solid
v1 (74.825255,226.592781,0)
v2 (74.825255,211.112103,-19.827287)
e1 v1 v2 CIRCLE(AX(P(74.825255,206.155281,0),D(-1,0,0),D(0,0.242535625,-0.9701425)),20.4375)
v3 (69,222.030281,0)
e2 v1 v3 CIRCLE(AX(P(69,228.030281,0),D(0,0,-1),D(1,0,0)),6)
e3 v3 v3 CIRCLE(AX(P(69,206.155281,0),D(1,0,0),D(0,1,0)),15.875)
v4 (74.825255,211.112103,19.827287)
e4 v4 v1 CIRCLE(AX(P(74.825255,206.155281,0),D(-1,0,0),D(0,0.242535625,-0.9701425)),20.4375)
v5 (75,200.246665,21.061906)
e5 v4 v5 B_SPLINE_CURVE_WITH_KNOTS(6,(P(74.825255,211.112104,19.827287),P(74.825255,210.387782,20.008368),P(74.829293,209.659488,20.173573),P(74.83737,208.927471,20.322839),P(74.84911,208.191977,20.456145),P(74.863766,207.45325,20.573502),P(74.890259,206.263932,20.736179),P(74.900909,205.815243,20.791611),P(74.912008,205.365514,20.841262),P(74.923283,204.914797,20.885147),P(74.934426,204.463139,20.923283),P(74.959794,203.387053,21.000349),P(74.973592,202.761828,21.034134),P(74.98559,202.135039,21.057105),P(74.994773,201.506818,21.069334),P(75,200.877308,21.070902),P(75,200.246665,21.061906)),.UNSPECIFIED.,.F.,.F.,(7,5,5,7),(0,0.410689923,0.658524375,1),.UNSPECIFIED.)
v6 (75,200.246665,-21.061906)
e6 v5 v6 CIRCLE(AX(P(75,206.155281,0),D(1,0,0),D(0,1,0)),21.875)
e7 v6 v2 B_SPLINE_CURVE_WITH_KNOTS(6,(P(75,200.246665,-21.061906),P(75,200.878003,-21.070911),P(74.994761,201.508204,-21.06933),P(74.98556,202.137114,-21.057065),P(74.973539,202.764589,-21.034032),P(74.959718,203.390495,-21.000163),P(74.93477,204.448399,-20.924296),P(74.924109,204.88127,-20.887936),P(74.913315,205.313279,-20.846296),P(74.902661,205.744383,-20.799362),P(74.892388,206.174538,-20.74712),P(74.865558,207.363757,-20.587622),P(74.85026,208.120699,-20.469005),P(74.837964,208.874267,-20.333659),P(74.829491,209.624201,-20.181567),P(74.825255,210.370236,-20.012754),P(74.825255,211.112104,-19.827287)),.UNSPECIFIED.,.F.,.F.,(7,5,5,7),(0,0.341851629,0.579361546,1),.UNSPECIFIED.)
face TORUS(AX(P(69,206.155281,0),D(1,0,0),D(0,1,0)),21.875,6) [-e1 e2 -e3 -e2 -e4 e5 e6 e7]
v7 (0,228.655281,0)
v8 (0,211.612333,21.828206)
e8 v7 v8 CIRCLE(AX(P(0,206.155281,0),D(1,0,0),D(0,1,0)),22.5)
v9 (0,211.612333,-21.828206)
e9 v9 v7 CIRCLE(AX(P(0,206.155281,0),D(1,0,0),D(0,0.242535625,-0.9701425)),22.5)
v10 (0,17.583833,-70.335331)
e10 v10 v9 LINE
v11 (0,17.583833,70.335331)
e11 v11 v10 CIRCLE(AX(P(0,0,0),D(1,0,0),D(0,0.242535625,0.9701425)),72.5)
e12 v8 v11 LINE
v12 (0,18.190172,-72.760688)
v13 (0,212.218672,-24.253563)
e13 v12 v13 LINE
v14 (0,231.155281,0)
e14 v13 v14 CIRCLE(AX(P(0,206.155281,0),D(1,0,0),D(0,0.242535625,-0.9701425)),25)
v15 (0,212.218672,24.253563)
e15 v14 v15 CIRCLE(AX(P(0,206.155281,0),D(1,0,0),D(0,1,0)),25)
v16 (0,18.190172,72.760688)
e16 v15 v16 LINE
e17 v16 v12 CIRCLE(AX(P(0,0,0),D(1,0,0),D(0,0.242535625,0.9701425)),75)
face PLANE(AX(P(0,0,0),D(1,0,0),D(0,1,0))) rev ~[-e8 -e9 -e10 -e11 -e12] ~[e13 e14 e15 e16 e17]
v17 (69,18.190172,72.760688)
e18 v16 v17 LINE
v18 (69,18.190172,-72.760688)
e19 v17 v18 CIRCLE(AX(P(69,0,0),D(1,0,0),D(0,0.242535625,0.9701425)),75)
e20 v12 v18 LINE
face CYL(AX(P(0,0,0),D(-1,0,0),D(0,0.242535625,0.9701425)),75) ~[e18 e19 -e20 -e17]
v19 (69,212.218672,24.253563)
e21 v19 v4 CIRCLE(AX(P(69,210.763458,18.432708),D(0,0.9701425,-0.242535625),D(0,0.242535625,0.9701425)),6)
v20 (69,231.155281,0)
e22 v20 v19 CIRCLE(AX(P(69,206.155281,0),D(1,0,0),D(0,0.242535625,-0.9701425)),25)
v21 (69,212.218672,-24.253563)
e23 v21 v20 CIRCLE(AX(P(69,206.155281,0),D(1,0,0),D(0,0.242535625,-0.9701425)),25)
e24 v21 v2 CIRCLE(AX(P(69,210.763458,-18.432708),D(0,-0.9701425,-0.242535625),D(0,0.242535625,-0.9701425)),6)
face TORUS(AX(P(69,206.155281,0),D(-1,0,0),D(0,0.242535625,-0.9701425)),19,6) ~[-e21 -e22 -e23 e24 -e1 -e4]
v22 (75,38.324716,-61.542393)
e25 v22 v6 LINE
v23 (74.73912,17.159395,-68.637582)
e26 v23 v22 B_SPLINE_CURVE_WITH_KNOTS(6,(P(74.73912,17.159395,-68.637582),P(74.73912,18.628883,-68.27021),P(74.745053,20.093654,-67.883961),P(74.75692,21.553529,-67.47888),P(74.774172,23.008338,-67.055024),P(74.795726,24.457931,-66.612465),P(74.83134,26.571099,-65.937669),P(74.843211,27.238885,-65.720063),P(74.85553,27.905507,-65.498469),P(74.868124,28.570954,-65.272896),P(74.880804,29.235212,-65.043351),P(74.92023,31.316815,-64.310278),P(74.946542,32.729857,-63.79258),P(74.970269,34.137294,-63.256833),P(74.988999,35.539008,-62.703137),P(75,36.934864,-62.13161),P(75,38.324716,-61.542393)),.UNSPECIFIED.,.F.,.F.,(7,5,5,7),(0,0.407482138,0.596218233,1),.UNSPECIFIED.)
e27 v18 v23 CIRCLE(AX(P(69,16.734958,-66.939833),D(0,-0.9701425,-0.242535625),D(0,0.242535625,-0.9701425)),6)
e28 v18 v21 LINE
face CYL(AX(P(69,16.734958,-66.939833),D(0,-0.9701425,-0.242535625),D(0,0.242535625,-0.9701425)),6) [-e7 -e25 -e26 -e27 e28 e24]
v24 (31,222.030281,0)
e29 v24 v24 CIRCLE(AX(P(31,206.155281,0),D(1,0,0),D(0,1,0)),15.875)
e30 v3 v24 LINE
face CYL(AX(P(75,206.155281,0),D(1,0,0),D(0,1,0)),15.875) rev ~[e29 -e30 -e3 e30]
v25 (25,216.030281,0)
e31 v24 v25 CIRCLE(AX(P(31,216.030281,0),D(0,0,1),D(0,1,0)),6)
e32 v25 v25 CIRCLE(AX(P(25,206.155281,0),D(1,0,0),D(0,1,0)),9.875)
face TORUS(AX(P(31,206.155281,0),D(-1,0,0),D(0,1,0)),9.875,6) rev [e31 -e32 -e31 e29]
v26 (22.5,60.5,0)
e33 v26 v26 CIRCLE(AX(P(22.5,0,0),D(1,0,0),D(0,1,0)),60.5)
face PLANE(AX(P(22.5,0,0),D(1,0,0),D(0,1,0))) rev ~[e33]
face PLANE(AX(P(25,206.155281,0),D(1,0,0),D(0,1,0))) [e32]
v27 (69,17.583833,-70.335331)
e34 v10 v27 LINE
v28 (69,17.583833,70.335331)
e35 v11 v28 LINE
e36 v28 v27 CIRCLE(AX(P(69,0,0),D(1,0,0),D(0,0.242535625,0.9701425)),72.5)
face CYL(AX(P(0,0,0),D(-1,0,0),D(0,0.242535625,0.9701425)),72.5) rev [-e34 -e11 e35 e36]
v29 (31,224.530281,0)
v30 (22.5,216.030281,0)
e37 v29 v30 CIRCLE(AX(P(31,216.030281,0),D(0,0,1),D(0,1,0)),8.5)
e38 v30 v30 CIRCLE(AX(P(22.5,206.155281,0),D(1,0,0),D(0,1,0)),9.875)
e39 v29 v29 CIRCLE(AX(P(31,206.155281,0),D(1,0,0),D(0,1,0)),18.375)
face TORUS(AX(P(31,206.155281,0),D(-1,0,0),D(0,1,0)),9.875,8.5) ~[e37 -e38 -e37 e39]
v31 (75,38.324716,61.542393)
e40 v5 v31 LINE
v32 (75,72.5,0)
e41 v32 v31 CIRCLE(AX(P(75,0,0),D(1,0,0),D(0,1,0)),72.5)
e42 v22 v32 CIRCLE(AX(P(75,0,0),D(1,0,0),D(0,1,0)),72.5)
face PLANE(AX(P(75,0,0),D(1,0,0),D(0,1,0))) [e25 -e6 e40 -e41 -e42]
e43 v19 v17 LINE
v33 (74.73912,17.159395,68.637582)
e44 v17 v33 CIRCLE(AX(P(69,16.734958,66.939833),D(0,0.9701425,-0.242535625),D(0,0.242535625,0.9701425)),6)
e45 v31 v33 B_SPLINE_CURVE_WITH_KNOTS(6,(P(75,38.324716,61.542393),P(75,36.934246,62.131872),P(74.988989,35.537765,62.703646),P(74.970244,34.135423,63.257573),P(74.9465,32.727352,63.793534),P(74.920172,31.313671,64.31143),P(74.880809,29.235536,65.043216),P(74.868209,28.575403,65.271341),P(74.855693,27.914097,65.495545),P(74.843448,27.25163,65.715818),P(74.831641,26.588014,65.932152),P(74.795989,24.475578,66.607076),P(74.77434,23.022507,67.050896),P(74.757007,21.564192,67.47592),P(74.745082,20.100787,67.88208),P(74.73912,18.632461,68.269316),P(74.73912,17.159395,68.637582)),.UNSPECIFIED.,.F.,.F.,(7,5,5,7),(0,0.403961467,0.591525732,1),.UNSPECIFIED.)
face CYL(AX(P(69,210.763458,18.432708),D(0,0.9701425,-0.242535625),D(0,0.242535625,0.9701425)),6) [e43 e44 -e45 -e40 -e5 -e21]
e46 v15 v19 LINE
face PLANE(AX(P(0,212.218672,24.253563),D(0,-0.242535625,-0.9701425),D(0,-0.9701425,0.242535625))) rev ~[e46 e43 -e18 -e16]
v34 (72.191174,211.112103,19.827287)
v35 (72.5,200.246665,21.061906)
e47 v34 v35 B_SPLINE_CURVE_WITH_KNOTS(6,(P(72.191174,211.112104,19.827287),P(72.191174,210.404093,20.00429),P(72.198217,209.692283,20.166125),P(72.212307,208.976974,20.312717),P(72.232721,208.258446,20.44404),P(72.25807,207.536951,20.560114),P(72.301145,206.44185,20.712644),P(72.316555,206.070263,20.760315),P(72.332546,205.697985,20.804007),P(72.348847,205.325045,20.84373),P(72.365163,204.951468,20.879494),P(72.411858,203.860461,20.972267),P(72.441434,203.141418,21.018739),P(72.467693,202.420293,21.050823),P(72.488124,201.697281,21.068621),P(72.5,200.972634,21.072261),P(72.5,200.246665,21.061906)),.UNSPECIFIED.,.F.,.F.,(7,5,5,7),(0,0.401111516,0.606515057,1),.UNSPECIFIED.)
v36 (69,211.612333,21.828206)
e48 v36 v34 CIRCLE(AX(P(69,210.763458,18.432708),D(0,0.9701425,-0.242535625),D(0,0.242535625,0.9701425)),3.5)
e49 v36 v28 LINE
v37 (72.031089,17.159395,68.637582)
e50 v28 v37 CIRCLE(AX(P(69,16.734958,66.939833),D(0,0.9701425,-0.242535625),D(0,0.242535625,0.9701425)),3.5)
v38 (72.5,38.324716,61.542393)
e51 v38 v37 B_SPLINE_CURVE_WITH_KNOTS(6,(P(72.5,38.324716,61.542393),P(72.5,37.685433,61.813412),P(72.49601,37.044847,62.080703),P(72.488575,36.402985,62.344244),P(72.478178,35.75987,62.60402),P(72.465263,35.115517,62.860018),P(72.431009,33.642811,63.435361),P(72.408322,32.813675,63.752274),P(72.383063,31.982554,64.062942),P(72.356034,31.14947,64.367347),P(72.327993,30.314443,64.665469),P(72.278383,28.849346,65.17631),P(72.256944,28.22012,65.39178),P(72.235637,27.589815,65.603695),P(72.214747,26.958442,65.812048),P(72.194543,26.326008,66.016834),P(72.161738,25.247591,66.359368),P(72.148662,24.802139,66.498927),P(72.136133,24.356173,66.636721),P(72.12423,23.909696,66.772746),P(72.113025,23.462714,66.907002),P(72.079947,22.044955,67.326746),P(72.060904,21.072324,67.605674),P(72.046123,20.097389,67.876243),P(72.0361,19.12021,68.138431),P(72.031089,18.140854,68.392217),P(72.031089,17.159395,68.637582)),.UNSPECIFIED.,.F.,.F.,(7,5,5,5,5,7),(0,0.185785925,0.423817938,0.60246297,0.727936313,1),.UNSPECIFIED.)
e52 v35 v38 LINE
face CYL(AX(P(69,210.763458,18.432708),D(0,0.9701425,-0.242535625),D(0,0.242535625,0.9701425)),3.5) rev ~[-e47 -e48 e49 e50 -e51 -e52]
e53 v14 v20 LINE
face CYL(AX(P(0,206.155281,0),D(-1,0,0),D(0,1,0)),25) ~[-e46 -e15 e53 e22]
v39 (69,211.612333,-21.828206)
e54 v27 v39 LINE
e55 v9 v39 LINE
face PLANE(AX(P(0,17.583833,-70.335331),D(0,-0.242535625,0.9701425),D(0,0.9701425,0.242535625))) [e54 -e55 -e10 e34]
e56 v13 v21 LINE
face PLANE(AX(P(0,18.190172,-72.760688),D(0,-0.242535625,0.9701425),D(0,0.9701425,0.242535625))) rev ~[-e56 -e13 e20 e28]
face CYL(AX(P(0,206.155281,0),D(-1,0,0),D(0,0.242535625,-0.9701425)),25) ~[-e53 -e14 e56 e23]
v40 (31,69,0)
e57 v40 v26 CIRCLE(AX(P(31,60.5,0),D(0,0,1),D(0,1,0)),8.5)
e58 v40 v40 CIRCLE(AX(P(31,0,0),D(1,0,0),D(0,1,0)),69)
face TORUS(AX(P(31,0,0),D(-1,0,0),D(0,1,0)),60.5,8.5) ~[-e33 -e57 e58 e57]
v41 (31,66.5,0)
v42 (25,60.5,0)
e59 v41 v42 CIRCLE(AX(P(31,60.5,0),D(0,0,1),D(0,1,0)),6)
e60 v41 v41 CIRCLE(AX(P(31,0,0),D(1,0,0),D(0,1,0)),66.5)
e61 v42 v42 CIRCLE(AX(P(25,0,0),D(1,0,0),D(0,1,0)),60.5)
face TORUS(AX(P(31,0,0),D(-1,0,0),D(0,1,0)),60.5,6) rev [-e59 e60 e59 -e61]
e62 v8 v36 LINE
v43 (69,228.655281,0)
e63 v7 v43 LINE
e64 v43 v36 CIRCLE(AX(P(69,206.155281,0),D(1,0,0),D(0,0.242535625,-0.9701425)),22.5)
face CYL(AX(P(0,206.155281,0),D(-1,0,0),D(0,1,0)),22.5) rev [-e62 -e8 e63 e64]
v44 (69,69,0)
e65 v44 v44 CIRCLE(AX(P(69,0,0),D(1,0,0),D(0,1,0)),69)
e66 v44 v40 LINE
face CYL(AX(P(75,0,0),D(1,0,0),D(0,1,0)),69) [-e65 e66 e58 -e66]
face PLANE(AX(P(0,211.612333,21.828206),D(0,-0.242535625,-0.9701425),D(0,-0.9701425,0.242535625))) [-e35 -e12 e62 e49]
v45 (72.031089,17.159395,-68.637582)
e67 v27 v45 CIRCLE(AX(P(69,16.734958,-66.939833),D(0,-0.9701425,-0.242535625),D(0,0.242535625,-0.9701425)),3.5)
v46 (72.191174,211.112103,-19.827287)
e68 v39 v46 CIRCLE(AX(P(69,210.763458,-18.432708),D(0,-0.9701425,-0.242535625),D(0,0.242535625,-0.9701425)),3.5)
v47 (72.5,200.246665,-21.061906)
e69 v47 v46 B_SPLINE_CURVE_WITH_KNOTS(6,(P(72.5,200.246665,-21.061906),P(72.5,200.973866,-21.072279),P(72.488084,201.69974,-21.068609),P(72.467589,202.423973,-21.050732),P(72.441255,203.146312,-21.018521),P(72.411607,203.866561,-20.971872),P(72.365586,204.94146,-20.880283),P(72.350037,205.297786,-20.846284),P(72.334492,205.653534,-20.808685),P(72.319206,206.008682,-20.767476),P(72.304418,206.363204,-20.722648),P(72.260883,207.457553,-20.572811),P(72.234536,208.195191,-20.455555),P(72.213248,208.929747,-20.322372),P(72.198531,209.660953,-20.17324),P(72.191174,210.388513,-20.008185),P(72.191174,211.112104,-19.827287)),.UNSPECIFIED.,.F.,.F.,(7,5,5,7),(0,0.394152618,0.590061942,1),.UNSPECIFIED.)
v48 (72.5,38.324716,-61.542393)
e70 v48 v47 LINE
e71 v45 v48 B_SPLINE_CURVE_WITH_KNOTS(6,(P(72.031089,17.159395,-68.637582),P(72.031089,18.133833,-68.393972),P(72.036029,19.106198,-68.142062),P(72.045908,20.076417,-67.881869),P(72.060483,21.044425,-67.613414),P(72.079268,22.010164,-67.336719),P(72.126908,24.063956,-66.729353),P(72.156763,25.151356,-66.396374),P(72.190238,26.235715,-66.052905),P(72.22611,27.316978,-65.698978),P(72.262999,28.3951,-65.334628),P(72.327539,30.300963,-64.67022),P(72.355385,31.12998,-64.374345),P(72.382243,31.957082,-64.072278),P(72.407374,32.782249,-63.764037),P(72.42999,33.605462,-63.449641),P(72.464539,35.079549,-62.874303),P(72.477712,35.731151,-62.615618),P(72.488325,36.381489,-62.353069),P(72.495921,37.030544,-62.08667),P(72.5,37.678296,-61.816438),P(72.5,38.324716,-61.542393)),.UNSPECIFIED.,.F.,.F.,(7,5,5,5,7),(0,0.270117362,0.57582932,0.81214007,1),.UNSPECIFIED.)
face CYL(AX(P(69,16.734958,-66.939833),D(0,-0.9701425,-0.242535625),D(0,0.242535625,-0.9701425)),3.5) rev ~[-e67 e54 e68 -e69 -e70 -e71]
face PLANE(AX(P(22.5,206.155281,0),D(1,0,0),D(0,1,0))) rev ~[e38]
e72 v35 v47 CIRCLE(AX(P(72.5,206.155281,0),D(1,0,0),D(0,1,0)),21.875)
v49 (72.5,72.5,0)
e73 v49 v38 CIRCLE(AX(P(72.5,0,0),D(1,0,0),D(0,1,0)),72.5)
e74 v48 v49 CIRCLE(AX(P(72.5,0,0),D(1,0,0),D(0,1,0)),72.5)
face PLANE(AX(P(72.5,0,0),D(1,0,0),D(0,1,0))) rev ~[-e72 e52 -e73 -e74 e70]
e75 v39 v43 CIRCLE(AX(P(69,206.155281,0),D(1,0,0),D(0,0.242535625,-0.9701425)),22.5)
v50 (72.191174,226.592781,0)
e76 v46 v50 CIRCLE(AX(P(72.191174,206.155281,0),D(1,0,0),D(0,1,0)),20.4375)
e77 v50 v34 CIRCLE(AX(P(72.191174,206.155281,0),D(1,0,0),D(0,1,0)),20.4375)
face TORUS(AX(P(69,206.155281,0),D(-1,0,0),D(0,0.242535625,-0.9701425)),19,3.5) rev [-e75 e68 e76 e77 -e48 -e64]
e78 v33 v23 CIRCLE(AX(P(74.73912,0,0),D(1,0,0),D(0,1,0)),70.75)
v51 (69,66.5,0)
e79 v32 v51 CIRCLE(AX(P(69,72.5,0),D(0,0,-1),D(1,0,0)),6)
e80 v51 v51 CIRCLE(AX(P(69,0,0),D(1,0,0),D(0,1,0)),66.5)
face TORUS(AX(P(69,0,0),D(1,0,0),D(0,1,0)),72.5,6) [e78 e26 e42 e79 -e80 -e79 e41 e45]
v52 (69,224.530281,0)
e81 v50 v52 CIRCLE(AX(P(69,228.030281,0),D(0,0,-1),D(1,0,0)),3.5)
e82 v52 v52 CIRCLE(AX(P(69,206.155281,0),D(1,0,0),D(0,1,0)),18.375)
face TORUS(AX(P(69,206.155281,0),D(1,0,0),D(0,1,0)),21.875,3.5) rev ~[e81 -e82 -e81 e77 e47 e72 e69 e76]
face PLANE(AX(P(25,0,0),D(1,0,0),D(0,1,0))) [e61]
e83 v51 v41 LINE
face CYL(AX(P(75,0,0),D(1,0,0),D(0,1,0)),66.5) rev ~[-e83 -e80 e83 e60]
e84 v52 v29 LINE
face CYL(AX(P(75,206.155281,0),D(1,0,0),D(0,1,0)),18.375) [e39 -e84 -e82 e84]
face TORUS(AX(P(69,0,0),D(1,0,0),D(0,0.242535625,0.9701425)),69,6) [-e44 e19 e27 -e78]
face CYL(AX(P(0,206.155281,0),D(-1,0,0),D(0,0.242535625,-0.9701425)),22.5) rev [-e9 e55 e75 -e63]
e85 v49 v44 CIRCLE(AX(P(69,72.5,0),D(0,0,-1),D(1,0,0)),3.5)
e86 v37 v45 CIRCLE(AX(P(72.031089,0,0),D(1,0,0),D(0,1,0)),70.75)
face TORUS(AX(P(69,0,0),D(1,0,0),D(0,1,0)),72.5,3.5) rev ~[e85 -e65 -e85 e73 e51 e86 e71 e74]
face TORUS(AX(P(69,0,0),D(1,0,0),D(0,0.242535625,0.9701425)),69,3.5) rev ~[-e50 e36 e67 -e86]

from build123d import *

# Parameters (mm, degrees)
F1_DEPTH     = 75
F2_R         = 66.5
F2_R_2       = 15.875
F3_DEPTH     = 50
F4_T13_ANGLE = 208.0724869359
F4_T16_DEPTH = 200
F4_T19_DEPTH = 200
F4_T22_ANGLE = 151.9275130641
F5_T         = -2.5


# Not quite as in the source:
# - a fillet or chamfer that OpenCascade refuses, or shapes differently, is made with other operations: its cross-section is extruded or revolved along the edge and cut away or added


with BuildPart() as f1:
    # F0 (on Right) → F1 (new body)
    with BuildSketch(Plane.YZ):
        with BuildLine():
            ThreePointArc((18.1901718777, -72.7606875109), (59.1154078512, -46.1559157052), (75, 0))
            ThreePointArc((75, 0), (59.1154078512, 46.1559157052), (18.1901718777, 72.7606875109))
            ThreePointArc((18.1901718777, 72.7606875109), (-75, 0), (18.1901718777, -72.7606875109))
        make_face()
        with BuildLine():
            ThreePointArc((18.1901718777, 72.7606875109), (59.1154078512, 46.1559157052), (75, 0))
            ThreePointArc((75, 0), (59.1154078512, -46.1559157052), (18.1901718777, -72.7606875109))
            Line((18.1901718777, -72.7606875109), (212.2186719068, -24.2535625036))
            ThreePointArc((212.2186719068, -24.2535625036), (181.1552812809, 0), (212.2186719068, 24.2535625036))
            Line((212.2186719068, 24.2535625036), (18.1901718777, 72.7606875109))
        make_face()
        with BuildLine():
            ThreePointArc((231.1552812809, 0), (225.8604172313, 15.3853052351), (212.2186719068, 24.2535625036))
            ThreePointArc((212.2186719068, 24.2535625036), (181.1552812809, 0), (212.2186719068, -24.2535625036))
            ThreePointArc((212.2186719068, -24.2535625036), (225.8604172313, -15.3853052351), (231.1552812809, 0))
        make_face()
    extrude(amount=F1_DEPTH)

    # F2 (on face) → F3 (cut)
    with BuildSketch(Plane.YZ.offset(75)):
        Circle(F2_R)
        with Locations((206.1552812809, 0)):
            Circle(F2_R_2)
    extrude(amount=-F3_DEPTH, mode=Mode.SUBTRACT)

    # F4: fillet of radius 6 on 9 edges, made by hand


with BuildPart() as f4_tool1:
    # F4_s2 → F4_t3 (revolve)
    with BuildSketch(Plane.XY):
        with BuildLine():
            ThreePointArc((31, 66.5), (26.7573593129, 64.7426406871), (25, 60.5))
            Line((25, 60.5), (25, 66.5))
            Line((25, 66.5), (31, 66.5))
        make_face()
    revolve(axis=Axis((25, 0, 0), (1, 0, 0)))


with BuildPart() as f4_tool4:
    # F4_s5 → F4_t6 (revolve)
    with BuildSketch(Plane.XY):
        with BuildLine():
            ThreePointArc((31, 222.0302812809), (26.7573593129, 220.272921968), (25, 216.0302812809))
            Line((25, 216.0302812809), (25, 222.0302812809))
            Line((25, 222.0302812809), (31, 222.0302812809))
        make_face()
    revolve(axis=Axis((25, 206.1552812809, 0), (1, 0, 0)))


with BuildPart() as f1_1:
    add(f1.part)

    # F4_t7: union F4_tool1, F4_tool4
    add([f4_tool1.part, f4_tool4.part])


with BuildPart() as f4_tool8:
    # F4_s9 → F4_t10 (revolve)
    with BuildSketch(Plane.XY):
        with BuildLine():
            ThreePointArc((75, 72.5), (73.2426406871, 68.2573593129), (69, 66.5))
            Line((69, 66.5), (75, 66.5))
            Line((75, 66.5), (75, 72.5))
        make_face()
    revolve(axis=Axis((75, 0, 0), (1, 0, 0)))


with BuildPart() as f4_tool11:
    # F4_s12 → F4_t13 (revolve)
    with BuildSketch(Plane(origin=(0, 0, 0), x_dir=(1, 0, 0), z_dir=(0, 0.9701425001, -0.242535625))):
        with BuildLine():
            ThreePointArc((69, -75), (73.2426406871, -73.2426406871), (75, -69))
            Line((75, -69), (75, -75))
            Line((75, -75), (69, -75))
        make_face()
    revolve(axis=Axis((75, 0, 0), (1, 0, 0)), revolution_arc=F4_T13_ANGLE)


with BuildPart() as f4_tool14:
    # F4_s15 → F4_t16 (new body)
    with BuildSketch(Plane(origin=(0, 194.0285000291, -48.5071250073), x_dir=(1, 0, 0), z_dir=(0, -0.9701425001, 0.242535625))):
        with BuildLine():
            ThreePointArc((69, 75), (73.2426406871, 73.2426406871), (75, 69))
            Line((75, 69), (75, 75))
            Line((75, 75), (69, 75))
        make_face()
    extrude(amount=F4_T16_DEPTH)


with BuildPart() as f4_tool17:
    # F4_s18 → F4_t19 (new body)
    with BuildSketch(Plane(origin=(0, 0, 0), x_dir=(1, 0, 0), z_dir=(0, 0.9701425001, 0.242535625))):
        with BuildLine():
            ThreePointArc((69, 75), (73.2426406871, 73.2426406871), (75, 69))
            Line((75, 69), (75, 75))
            Line((75, 75), (69, 75))
        make_face()
    extrude(amount=F4_T19_DEPTH)


with BuildPart() as f4_tool20:
    # F4_s21 → F4_t22 (revolve)
    with BuildSketch(Plane(origin=(0, 194.0285000291, 48.5071250073), x_dir=(1, 0, 0), z_dir=(0, -0.9701425001, -0.242535625))):
        with BuildLine():
            ThreePointArc((75, -69), (73.2426406871, -73.2426406871), (69, -75))
            Line((69, -75), (75, -75))
            Line((75, -75), (75, -69))
        make_face()
    revolve(axis=Axis((75, 206.1552812809, 0), (1, 0, 0)), revolution_arc=F4_T22_ANGLE)


with BuildPart() as f4_tool23:
    # F4_s24 → F4_t25 (revolve)
    with BuildSketch(Plane.XY):
        with BuildLine():
            ThreePointArc((75, 228.0302812809), (73.2426406871, 223.7876405938), (69, 222.0302812809))
            Line((69, 222.0302812809), (75, 222.0302812809))
            Line((75, 222.0302812809), (75, 228.0302812809))
        make_face()
    revolve(axis=Axis((75, 206.1552812809, 0), (1, 0, 0)))


with BuildPart() as f1_2:
    add(f1_1.part)

    # F4_t26: cut F4_tool8, F4_tool11, F4_tool14, F4_tool17, F4_tool20, F4_tool23
    add([f4_tool8.part, f4_tool11.part, f4_tool14.part, f4_tool17.part, f4_tool20.part, f4_tool23.part], mode=Mode.SUBTRACT)

    # F5
    f5_openings = [f1_2.faces().sort_by_distance(p)[0] for p in [
        (0, 56.613425, 0),
    ]]
    offset(amount=F5_T, openings=f5_openings)


solid = f1_2.part
